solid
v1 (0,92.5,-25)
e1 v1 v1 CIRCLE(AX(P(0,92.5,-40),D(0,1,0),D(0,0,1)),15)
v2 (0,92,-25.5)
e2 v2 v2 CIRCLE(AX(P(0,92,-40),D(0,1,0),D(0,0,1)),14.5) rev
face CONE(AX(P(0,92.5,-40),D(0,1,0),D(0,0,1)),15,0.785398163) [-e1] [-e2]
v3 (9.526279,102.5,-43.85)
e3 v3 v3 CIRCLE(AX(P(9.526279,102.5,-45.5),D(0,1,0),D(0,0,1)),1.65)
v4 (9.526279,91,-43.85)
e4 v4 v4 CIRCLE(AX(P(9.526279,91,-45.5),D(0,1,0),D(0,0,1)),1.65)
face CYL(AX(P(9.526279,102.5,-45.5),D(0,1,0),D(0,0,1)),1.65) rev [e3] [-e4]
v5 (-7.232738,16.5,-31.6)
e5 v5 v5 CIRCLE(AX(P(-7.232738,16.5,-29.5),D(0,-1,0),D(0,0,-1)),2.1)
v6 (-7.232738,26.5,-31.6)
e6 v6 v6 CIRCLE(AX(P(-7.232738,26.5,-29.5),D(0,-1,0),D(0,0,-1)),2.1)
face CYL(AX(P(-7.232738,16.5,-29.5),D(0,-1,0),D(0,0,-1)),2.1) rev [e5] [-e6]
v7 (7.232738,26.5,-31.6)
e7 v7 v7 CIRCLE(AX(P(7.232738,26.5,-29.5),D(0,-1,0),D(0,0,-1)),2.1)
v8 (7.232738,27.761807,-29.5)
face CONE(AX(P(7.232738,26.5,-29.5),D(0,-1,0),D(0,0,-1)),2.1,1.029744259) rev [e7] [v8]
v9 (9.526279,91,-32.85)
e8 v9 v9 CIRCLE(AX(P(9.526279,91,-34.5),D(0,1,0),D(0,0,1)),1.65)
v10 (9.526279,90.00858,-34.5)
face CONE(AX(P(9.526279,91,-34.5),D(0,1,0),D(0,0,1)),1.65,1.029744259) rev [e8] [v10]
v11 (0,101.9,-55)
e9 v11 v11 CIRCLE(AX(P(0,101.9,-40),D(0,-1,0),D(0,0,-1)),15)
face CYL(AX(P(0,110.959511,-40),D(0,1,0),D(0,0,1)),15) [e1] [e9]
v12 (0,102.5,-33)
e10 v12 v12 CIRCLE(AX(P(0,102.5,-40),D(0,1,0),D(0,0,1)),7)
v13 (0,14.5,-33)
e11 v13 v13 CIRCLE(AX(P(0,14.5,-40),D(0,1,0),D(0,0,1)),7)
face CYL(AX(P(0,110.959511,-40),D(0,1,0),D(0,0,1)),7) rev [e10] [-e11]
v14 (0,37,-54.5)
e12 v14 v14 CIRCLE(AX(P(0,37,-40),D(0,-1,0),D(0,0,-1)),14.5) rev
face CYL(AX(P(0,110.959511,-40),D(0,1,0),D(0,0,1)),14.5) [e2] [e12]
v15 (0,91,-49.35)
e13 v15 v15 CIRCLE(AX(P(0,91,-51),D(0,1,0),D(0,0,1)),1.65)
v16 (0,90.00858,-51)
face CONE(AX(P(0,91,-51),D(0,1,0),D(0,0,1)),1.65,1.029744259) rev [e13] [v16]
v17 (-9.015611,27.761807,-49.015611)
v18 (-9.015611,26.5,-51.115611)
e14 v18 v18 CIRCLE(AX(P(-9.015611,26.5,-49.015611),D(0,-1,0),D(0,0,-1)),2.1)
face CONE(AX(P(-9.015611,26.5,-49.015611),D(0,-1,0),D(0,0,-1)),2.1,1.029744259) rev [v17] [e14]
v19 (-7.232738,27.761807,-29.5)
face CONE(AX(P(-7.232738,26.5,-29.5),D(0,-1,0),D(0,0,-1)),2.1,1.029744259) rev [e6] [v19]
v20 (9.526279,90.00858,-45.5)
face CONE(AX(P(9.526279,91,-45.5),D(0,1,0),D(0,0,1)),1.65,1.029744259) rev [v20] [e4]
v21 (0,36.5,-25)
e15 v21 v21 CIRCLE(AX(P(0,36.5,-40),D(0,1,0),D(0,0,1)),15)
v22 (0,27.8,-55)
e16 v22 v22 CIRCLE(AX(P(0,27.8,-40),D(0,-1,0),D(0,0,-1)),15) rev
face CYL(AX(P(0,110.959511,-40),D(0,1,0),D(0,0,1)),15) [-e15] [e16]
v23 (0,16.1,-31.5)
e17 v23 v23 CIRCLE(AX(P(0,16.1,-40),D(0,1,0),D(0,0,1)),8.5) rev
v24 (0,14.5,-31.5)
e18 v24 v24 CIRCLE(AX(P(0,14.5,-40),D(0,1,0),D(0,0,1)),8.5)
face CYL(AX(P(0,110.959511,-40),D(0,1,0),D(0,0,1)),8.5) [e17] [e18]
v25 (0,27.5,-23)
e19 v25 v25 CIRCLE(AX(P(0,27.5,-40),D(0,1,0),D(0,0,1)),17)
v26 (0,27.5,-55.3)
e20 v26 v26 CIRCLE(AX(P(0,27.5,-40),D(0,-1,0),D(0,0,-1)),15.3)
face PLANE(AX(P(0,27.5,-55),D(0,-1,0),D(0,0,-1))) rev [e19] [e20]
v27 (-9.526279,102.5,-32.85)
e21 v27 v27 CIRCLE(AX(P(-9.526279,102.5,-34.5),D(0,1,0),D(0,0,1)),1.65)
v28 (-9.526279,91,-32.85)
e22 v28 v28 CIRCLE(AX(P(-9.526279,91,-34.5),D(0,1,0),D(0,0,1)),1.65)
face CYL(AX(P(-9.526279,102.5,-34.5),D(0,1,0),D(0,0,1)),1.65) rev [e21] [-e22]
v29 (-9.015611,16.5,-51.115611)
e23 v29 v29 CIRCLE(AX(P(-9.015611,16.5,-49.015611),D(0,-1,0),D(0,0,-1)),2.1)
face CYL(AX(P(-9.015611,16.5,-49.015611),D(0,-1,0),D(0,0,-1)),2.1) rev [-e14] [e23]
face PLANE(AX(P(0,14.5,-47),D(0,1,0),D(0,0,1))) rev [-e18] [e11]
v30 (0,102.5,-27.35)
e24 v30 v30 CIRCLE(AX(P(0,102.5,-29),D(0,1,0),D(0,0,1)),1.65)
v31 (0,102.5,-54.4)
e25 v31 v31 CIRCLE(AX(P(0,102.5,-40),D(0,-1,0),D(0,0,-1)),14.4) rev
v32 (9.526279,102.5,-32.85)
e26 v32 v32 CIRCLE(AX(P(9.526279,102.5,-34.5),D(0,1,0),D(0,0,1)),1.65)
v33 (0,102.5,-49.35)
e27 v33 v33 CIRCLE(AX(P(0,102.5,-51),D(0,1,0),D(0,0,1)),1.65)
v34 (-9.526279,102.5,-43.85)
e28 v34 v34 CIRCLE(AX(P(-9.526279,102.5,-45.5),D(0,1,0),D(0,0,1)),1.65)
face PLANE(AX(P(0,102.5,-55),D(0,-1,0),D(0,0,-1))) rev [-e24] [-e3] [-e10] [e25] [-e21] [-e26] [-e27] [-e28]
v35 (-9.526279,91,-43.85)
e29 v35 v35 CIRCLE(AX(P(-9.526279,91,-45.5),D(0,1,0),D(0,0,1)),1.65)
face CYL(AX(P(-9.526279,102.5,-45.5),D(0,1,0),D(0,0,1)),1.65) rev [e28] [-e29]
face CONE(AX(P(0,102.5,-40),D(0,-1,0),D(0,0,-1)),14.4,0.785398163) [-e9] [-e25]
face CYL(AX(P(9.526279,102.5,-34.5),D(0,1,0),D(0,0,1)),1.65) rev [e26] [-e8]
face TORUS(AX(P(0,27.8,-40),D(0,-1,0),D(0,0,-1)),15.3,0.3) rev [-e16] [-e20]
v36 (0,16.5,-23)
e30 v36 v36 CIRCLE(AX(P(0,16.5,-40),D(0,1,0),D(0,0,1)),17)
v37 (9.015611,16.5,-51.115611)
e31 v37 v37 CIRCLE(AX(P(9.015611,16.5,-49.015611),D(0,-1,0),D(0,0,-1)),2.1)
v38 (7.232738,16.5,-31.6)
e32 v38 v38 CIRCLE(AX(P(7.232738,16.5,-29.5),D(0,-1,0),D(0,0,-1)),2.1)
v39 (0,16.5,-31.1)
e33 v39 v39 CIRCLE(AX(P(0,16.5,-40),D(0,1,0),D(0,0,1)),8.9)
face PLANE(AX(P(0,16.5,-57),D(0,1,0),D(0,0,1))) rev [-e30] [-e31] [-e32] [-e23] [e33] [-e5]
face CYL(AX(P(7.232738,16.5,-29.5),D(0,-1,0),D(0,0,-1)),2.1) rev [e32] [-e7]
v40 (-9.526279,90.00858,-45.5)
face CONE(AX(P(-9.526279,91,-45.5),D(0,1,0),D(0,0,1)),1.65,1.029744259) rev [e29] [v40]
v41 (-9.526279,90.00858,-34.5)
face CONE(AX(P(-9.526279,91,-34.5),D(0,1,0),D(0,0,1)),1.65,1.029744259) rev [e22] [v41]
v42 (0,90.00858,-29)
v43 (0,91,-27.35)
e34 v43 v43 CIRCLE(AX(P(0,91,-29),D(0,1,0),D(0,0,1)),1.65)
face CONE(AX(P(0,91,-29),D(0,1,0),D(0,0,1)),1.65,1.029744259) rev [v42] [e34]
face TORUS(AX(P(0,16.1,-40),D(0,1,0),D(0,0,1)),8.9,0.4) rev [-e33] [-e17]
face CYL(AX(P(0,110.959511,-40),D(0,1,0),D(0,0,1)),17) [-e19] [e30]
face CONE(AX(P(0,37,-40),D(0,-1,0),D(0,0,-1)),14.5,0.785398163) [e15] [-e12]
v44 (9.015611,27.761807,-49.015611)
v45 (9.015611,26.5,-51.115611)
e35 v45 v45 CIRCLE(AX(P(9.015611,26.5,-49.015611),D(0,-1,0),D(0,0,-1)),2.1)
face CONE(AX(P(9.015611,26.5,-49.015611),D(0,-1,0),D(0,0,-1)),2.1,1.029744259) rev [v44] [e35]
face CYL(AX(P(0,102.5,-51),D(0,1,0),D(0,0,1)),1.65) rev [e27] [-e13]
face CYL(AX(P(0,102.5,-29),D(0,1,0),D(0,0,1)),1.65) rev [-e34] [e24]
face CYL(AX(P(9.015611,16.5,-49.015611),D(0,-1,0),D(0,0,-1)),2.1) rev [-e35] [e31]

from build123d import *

# Parameters (mm, degrees)
SKETCH6_W                     = 2.15
SKETCH6_H                     = 89.5
M4_CLEARANCE_HOLE2_AT_2_COUNT = 2
M4_CLEARANCE_HOLE2_AT_2_PITCH = 11
M4_CLEARANCE_HOLE2_AT_3_COUNT = 2
M4_CLEARANCE_HOLE2_AT_3_PITCH = 19.052558883
M4_CLEARANCE_HOLE2_AT_4_COUNT = 2
M4_CLEARANCE_HOLE2_AT_4_PITCH = 22
M4_CLEARANCE_HOLE2_AT_5_COUNT = 2
M4_CLEARANCE_HOLE2_AT_5_PITCH = 19.052558883
M4_CLEARANCE_HOLE2_AT_6_COUNT = 2
M4_CLEARANCE_HOLE2_AT_6_PITCH = 11
M4_TAPPED_HOLE1_AT_2_COUNT    = 2
M4_TAPPED_HOLE1_AT_2_PITCH    = 11
M4_TAPPED_HOLE1_AT_3_COUNT    = 2
M4_TAPPED_HOLE1_AT_3_PITCH    = 19.052558883
M4_TAPPED_HOLE1_AT_4_COUNT    = 2
M4_TAPPED_HOLE1_AT_4_PITCH    = 11
M4_TAPPED_HOLE1_AT_5_COUNT    = 2
M4_TAPPED_HOLE1_AT_5_PITCH    = 19.052558883
M4_TAPPED_HOLE1_AT_6_COUNT    = 2
M4_TAPPED_HOLE1_AT_6_PITCH    = 22
M5_TAPPED_HOLE1_AT_2_COUNT    = 2
M5_TAPPED_HOLE1_AT_2_PITCH    = 18.03122292
M5_TAPPED_HOLE1_AT_3_COUNT    = 2
M5_TAPPED_HOLE1_AT_3_PITCH    = 19.596880573
M5_TAPPED_HOLE1_AT_4_COUNT    = 2
M5_TAPPED_HOLE1_AT_4_PITCH    = 25.394250395
CHAMFER1_SIZE                 = 0.6
FILLET1_R                     = 0.3
CHAMFER2_SIZE                 = 0.5
FILLET2_R                     = 0.4
FILLET3_R                     = 0.4


with BuildPart() as part:
    # Sketch1 → Revolve1 (revolve)
    with BuildSketch(Plane(origin=(0, 0, 0), x_dir=(0, 0, -1), z_dir=(1, 0, 0)), mode=Mode.PRIVATE) as revolve1_sk:
        Polygon((55, 102.5), (55, 92.5), (54.5, 92.5), (54.5, 36.5), (55, 36.5), (55, 27.5), (57, 27.5), (57, 20.5), (57, 16.5), (48.5, 16.5), (48.5, 14.5), (47, 14.5), (47, 102.5), align=None)
    revolve(revolve1_sk.sketch.rotate(Axis((0, 110.959510929, -40), (0, -1, 0)), 180), axis=Axis((0, 110.959510929, -40), (0, -1, 0)))

    # Sketch12 → M4 Tapped Hole1 (revolve, cut)
    with BuildSketch(Plane(origin=(0, 102.5, -51), x_dir=(0, 0, 1), z_dir=(1, 0, 0))):
        Polygon((0, 0), (0, 12.491420021), (1.65, 11.5), (1.65, 0), align=None)
    m4_tapped_hole1 = revolve(axis=Axis((0, 108.85, -51), (0, -1, 0)), mode=Mode.SUBTRACT)

    # M4 Tapped Hole1 at 2: M4 Tapped Hole1 ×2
    with Locations(*[Vector(0.8660254037844388, 0, 0.49999999999999983) * (i * M4_TAPPED_HOLE1_AT_2_PITCH) for i in range(1, M4_TAPPED_HOLE1_AT_2_COUNT)]):
        add(m4_tapped_hole1, mode=Mode.SUBTRACT)

    # M4 Tapped Hole1 at 3: M4 Tapped Hole1 ×2
    with Locations(*[Vector(0.5000000000000001, 0, 0.8660254037844386) * (i * M4_TAPPED_HOLE1_AT_3_PITCH) for i in range(1, M4_TAPPED_HOLE1_AT_3_COUNT)]):
        add(m4_tapped_hole1, mode=Mode.SUBTRACT)

    # M4 Tapped Hole1 at 4: M4 Tapped Hole1 ×2
    with Locations(*[Vector(-0.8660254037844386, 0, 0.5000000000000003) * (i * M4_TAPPED_HOLE1_AT_4_PITCH) for i in range(1, M4_TAPPED_HOLE1_AT_4_COUNT)]):
        add(m4_tapped_hole1, mode=Mode.SUBTRACT)

    # M4 Tapped Hole1 at 5: M4 Tapped Hole1 ×2
    with Locations(*[Vector(-0.4999999999999999, 0, 0.8660254037844388) * (i * M4_TAPPED_HOLE1_AT_5_PITCH) for i in range(1, M4_TAPPED_HOLE1_AT_5_COUNT)]):
        add(m4_tapped_hole1, mode=Mode.SUBTRACT)

    # M4 Tapped Hole1 at 6: M4 Tapped Hole1 ×2
    with Locations(*[(0, 0, i * M4_TAPPED_HOLE1_AT_6_PITCH) for i in range(1, M4_TAPPED_HOLE1_AT_6_COUNT)]):
        add(m4_tapped_hole1, mode=Mode.SUBTRACT)

    # Sketch15 → M5 Tapped Hole1 (revolve, cut)
    with BuildSketch(Plane(origin=(9.01561146, 16.5, -49.01561146), x_dir=(0, 0, -1), z_dir=(1, 0, 0))):
        Polygon((0, 0), (0, 11.2618073), (2.1, 10), (2.1, 0), align=None)
    m5_tapped_hole1 = revolve(axis=Axis((9.01561146, 10.15, -49.01561146), (0, 1, 0)), mode=Mode.SUBTRACT)

    # M5 Tapped Hole1 at 2: M5 Tapped Hole1 ×2
    with Locations(*[(-i * M5_TAPPED_HOLE1_AT_2_PITCH, 0, 0) for i in range(1, M5_TAPPED_HOLE1_AT_2_COUNT)]):
        add(m5_tapped_hole1, mode=Mode.SUBTRACT)

    # M5 Tapped Hole1 at 3: M5 Tapped Hole1 ×2
    with Locations(*[Vector(-0.09097740748886197, 0, 0.9958529566791503) * (i * M5_TAPPED_HOLE1_AT_3_PITCH) for i in range(1, M5_TAPPED_HOLE1_AT_3_COUNT)]):
        add(m5_tapped_hole1, mode=Mode.SUBTRACT)

    # M5 Tapped Hole1 at 4: M5 Tapped Hole1 ×2
    with Locations(*[Vector(-0.639843636962356, 0, 0.768505120502645) * (i * M5_TAPPED_HOLE1_AT_4_PITCH) for i in range(1, M5_TAPPED_HOLE1_AT_4_COUNT)]):
        add(m5_tapped_hole1, mode=Mode.SUBTRACT)

    # Chamfer1
    chamfer1_edges = [part.edges().sort_by_distance(p)[0] for p in [
        (0, 102.5, -55),
    ]]
    chamfer(chamfer1_edges, length=CHAMFER1_SIZE)

    # Fillet1
    fillet1_edges = [part.edges().sort_by_distance(p)[0] for p in [
        (0, 27.5, -55),
    ]]
    fillet(fillet1_edges, radius=FILLET1_R)

    # Chamfer2
    chamfer2_edges = [part.edges().sort_by_distance(p)[0] for p in [
        (0, 92.5, -54.5),
        (0, 36.5, -54.5),
    ]]
    chamfer(chamfer2_edges, length=CHAMFER2_SIZE - 0.0001)  # a hair under: the kernel refuses the full size

    # Fillet2
    fillet2_edges = [part.edges().sort_by_distance(p)[0] for p in [
        (0, 16.5, -48.5),
    ]]
    fillet(fillet2_edges, radius=FILLET2_R)


with BuildPart() as body_2:
    # Sketch2 → Revolve2 (revolve)
    with BuildSketch(Plane(origin=(0, 0, 0), x_dir=(0, 0, -1), z_dir=(1, 0, 0)), mode=Mode.PRIVATE) as revolve2_sk:
        Polygon((47, 106), (57, 106), (57, 101.5), (55, 101.5), (55, 103), (47, 103), align=None)
    revolve(revolve2_sk.sketch.rotate(Axis((0, 110.959510929, -40), (0, -1, 0)), 180), axis=Axis((0, 110.959510929, -40), (0, -1, 0)))

    # Sketch6 → M4 Clearance Hole2 (revolve, cut)
    with BuildSketch(Plane(origin=(-9.526279442, 106, -45.5), x_dir=(0, 0, 1), z_dir=(1, 0, 0))):
        with Locations((1.075, 44.75)):
            Rectangle(SKETCH6_W, SKETCH6_H)
    m4_clearance_hole2 = revolve(axis=Axis((-9.526279442, 112.35, -45.5), (0, -1, 0)), mode=Mode.SUBTRACT)

    # M4 Clearance Hole2 at 2: M4 Clearance Hole2 ×2
    with Locations(*[Vector(0.8660254037844386, 0, -0.5000000000000003) * (i * M4_CLEARANCE_HOLE2_AT_2_PITCH) for i in range(1, M4_CLEARANCE_HOLE2_AT_2_COUNT)]):
        add(m4_clearance_hole2, mode=Mode.SUBTRACT)

    # M4 Clearance Hole2 at 3: M4 Clearance Hole2 ×2
    with Locations(*[(i * M4_CLEARANCE_HOLE2_AT_3_PITCH, 0, 0) for i in range(1, M4_CLEARANCE_HOLE2_AT_3_COUNT)]):
        add(m4_clearance_hole2, mode=Mode.SUBTRACT)

    # M4 Clearance Hole2 at 4: M4 Clearance Hole2 ×2
    with Locations(*[Vector(0.8660254037844387, 0, 0.49999999999999994) * (i * M4_CLEARANCE_HOLE2_AT_4_PITCH) for i in range(1, M4_CLEARANCE_HOLE2_AT_4_COUNT)]):
        add(m4_clearance_hole2, mode=Mode.SUBTRACT)

    # M4 Clearance Hole2 at 5: M4 Clearance Hole2 ×2
    with Locations(*[Vector(0.5000000000000001, 0, 0.8660254037844387) * (i * M4_CLEARANCE_HOLE2_AT_5_PITCH) for i in range(1, M4_CLEARANCE_HOLE2_AT_5_COUNT)]):
        add(m4_clearance_hole2, mode=Mode.SUBTRACT)

    # M4 Clearance Hole2 at 6: M4 Clearance Hole2 ×2
    with Locations(*[(0, 0, i * M4_CLEARANCE_HOLE2_AT_6_PITCH) for i in range(1, M4_CLEARANCE_HOLE2_AT_6_COUNT)]):
        add(m4_clearance_hole2, mode=Mode.SUBTRACT)

    # Fillet3
    fillet3_edges = [body_2.edges().sort_by_distance(p)[0] for p in [
        (0, 103, -55),
    ]]
    fillet(fillet3_edges, radius=FILLET3_R)


solid = part.part
